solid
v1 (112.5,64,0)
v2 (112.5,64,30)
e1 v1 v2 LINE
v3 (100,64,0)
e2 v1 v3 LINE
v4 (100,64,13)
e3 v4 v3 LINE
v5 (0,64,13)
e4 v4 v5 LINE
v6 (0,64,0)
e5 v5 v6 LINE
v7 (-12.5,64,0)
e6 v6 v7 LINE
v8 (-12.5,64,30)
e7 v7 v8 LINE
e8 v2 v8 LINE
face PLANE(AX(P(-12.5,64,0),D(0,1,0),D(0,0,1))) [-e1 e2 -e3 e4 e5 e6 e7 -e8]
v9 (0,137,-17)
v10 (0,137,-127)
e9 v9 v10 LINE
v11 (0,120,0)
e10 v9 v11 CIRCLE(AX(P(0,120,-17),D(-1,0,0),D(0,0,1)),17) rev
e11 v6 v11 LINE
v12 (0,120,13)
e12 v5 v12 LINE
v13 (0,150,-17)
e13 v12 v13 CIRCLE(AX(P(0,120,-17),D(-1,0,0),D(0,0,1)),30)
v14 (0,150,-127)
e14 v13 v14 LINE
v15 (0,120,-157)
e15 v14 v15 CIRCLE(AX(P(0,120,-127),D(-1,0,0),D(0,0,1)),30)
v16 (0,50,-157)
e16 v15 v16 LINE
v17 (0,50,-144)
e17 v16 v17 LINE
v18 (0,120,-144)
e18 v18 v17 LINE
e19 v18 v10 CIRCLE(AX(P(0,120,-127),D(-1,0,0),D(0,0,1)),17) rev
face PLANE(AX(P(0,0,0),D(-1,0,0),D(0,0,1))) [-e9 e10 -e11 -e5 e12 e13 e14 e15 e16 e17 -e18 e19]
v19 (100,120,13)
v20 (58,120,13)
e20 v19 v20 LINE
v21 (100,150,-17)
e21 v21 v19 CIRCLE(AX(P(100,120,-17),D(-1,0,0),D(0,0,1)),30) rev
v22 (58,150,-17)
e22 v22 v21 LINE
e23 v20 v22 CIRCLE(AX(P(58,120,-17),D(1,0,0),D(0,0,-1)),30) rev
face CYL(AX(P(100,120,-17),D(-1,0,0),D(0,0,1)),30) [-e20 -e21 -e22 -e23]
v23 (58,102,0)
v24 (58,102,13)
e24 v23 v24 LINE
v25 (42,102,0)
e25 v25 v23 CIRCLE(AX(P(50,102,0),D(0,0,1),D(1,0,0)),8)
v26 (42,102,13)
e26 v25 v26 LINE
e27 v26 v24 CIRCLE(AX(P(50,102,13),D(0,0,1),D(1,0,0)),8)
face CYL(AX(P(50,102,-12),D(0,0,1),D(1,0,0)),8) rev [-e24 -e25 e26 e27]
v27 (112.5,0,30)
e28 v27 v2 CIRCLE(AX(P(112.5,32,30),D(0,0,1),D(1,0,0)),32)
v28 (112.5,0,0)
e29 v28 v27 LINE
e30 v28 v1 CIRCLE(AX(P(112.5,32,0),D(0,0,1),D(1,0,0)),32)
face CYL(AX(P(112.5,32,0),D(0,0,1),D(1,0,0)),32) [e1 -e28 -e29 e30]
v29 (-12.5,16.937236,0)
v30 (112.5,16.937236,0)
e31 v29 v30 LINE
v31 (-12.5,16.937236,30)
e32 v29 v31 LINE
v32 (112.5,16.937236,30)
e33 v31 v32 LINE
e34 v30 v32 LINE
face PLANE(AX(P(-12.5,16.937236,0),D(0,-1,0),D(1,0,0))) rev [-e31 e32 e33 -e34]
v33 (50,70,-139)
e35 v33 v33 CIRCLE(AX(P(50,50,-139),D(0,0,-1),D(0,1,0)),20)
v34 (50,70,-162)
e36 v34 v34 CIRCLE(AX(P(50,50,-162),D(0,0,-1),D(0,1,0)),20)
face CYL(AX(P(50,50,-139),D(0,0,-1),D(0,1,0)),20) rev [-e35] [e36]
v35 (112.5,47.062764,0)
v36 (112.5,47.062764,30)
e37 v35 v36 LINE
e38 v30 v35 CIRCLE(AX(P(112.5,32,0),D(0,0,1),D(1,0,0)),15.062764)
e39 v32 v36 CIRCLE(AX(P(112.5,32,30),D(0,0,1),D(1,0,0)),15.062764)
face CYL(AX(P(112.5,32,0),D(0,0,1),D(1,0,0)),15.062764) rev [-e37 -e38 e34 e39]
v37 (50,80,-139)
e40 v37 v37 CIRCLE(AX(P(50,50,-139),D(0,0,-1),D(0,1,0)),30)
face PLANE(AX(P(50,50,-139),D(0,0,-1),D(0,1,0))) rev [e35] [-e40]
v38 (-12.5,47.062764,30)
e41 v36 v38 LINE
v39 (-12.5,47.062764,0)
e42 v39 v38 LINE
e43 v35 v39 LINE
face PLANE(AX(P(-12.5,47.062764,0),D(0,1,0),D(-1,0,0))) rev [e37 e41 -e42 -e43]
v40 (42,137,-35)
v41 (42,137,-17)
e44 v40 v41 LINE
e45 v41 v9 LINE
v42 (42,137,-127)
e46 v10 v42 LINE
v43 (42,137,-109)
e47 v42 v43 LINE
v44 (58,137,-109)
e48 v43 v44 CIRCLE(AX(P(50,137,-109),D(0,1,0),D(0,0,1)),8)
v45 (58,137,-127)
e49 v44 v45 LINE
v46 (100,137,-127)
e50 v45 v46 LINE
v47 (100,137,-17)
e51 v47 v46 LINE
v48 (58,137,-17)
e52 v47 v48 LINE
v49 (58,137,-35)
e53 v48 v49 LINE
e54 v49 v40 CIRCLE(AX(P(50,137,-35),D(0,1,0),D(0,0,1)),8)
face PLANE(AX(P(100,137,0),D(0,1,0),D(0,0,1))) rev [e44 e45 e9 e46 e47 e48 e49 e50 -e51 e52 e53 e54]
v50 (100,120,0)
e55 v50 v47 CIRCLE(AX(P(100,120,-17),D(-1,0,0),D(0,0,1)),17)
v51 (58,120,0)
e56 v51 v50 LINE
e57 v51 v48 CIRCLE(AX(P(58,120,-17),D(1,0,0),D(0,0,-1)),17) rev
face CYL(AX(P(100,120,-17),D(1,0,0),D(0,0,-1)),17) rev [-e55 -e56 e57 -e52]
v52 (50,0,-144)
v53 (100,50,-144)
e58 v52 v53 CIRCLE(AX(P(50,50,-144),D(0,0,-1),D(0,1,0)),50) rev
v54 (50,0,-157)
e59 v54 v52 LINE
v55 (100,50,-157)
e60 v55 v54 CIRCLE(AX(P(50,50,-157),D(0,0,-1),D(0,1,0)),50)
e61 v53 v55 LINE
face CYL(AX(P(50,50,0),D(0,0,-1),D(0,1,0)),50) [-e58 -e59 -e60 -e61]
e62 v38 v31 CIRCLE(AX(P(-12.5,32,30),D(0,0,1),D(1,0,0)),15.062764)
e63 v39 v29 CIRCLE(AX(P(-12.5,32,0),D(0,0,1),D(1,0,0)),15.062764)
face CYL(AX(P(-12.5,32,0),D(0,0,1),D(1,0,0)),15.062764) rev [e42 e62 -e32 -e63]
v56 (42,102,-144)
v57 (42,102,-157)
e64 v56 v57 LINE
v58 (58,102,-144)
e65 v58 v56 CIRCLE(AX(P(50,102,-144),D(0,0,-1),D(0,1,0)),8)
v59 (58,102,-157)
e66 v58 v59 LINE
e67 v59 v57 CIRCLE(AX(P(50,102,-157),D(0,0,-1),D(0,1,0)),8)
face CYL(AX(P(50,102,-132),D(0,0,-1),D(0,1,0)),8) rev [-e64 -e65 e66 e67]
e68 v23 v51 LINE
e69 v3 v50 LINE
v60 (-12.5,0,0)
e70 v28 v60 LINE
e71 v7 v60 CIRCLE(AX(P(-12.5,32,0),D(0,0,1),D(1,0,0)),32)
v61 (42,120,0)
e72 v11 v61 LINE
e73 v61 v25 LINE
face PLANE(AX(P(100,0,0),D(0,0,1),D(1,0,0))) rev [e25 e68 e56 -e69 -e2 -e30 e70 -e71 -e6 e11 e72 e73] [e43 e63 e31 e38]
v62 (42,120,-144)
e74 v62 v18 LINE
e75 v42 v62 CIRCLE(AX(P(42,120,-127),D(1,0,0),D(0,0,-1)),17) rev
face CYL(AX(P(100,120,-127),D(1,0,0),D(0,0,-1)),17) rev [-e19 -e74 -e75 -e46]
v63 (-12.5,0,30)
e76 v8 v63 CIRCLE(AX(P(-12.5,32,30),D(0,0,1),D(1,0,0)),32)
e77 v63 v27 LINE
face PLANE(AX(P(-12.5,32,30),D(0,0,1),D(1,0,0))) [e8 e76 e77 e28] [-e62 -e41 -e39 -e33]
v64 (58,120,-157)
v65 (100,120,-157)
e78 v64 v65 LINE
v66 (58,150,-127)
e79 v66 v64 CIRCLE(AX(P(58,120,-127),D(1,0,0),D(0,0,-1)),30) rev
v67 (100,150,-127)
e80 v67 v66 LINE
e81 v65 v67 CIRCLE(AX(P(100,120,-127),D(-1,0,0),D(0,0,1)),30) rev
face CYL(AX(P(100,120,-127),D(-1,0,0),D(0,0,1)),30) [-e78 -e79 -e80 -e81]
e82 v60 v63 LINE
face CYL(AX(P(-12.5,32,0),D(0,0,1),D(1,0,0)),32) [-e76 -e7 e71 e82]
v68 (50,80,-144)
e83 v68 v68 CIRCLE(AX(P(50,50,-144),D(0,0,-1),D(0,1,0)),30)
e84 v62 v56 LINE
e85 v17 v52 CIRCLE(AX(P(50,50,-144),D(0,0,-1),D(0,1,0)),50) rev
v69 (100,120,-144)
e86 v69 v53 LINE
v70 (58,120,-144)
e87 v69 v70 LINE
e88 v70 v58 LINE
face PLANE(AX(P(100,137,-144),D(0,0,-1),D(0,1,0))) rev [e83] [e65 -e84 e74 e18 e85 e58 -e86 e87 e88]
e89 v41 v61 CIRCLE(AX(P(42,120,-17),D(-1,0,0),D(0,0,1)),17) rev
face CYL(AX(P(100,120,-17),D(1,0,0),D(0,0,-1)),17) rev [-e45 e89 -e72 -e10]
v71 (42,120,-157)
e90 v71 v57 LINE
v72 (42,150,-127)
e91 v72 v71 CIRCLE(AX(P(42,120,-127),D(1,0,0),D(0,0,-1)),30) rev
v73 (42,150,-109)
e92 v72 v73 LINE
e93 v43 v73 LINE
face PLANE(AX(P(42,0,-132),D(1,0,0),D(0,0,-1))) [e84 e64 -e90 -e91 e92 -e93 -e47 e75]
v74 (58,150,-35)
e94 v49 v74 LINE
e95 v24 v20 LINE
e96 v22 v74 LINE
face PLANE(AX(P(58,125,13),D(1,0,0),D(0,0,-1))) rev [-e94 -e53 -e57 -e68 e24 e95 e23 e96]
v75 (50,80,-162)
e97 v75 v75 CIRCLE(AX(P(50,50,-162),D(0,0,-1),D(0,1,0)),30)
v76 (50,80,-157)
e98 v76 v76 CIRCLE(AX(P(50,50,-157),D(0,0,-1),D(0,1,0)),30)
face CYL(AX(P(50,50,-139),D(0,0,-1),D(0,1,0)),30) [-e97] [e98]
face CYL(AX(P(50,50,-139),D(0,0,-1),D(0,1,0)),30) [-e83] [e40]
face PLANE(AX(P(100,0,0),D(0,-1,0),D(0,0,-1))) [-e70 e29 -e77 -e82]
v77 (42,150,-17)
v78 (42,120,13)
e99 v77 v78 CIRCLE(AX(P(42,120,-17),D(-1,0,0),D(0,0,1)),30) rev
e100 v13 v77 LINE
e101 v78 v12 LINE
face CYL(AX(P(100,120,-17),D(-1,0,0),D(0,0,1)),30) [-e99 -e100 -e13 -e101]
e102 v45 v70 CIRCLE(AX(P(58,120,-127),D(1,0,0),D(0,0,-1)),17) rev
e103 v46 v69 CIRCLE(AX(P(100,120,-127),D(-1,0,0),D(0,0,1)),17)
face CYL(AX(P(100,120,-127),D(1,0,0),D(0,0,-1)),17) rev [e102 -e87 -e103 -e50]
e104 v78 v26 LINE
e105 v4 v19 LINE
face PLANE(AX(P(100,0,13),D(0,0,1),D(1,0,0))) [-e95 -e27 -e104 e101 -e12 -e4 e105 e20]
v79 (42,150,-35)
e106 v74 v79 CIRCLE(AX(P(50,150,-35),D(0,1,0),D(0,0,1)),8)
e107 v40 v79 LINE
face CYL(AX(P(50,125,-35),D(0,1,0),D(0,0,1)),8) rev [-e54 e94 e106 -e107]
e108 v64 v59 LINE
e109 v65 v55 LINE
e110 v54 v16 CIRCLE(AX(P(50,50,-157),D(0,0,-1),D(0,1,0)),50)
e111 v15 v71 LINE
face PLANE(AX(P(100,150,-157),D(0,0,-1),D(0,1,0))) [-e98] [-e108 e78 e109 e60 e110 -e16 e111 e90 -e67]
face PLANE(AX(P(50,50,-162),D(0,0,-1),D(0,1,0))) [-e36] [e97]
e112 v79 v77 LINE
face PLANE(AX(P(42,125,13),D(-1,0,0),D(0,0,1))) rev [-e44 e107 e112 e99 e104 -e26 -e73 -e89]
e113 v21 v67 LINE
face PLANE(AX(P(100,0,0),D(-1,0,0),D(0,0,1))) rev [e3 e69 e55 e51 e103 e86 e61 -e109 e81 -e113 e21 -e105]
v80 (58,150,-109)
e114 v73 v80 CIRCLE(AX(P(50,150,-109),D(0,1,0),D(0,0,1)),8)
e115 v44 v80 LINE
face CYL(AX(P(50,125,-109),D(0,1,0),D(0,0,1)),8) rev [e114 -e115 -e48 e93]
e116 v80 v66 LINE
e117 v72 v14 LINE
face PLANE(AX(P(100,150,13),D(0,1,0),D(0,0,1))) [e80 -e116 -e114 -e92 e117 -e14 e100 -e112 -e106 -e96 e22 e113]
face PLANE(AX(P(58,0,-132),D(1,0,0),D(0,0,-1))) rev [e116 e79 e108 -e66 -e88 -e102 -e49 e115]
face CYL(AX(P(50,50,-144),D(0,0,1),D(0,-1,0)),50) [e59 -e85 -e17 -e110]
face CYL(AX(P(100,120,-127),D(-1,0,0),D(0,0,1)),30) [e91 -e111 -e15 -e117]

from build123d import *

# Parameters (mm, degrees)
BOSS_EXTRUDE1_DEPTH      = 100
FILLET1_R                = 30
FILLET2_R                = 17
BOSS_EXTRUDE2_DEPTH      = 17
BOSS_EXTRUDE2_DEPTH_BACK = 13
CUT_EXTRUDE1_START       = -17
SKETCH2_4_W              = 100
SKETCH2_4_H              = 30.125527048
CUT_EXTRUDE1_DEPTH       = 17
FILLET3_R                = 50
BOSS_EXTRUDE3_DEPTH      = 5
BOSS_EXTRUDE3_DEPTH_BACK = 18
SKETCH3_R                = 30
SKETCH3_R_2              = 20
SKETCH3_2_R              = 20
CUT_EXTRUDE2_DEPTH       = 25
CUT_EXTRUDE3_DEPTH       = 25
CUT_EXTRUDE4_DEPTH       = 25
CUT_EXTRUDE5_START       = -25
CUT_EXTRUDE5_DEPTH       = 25


with BuildPart() as part:
    # Sketch1 → Boss-Extrude1 (new body)
    with BuildSketch(Plane(origin=(0, 0, 0), x_dir=(0, 0, -1), z_dir=(1, 0, 0))):
        Polygon((0, 0), (0, 137), (144, 137), (144, 0), (157, 0), (157, 150), (-13, 150), (-13, 0), align=None)
    extrude(amount=BOSS_EXTRUDE1_DEPTH)

    # Fillet1
    fillet1_edges = [part.edges().sort_by_distance(p)[0] for p in [
        (50, 150, -157),
        (50, 150, 13),
    ]]
    fillet(fillet1_edges, radius=FILLET1_R)

    # Fillet2
    fillet2_edges = [part.edges().sort_by_distance(p)[0] for p in [
        (50, 137, 0),
        (50, 137, -144),
    ]]
    fillet(fillet2_edges, radius=FILLET2_R)

    # Sketch2 → Boss-Extrude2 (add, two sides: drawn at the far end of the back side and taken through both)
    with BuildSketch(Plane.XY.offset(13).offset(-BOSS_EXTRUDE2_DEPTH_BACK)):
        with BuildLine():
            Line((-12.5, 64), (112.5, 64))
            ThreePointArc((112.5, 64), (144.5, 32), (112.5, 0))
            Line((112.5, 0), (-12.5, 0))
            ThreePointArc((-12.5, 0), (-44.5, 32), (-12.5, 64))
        make_face()
        with BuildLine():
            Line((-12.5, 47.062763524), (112.5, 47.062763524))
            ThreePointArc((112.5, 47.062763524), (127.562763524, 32), (112.5, 16.937236476))
            Line((112.5, 16.937236476), (-12.5, 16.937236476))
            ThreePointArc((-12.5, 16.937236476), (-27.562763524, 32), (-12.5, 47.062763524))
        make_face(mode=Mode.SUBTRACT)
    extrude(amount=BOSS_EXTRUDE2_DEPTH + BOSS_EXTRUDE2_DEPTH_BACK)

    # Sketch2<4> → Cut-Extrude1 (cut)
    with BuildSketch(Plane.XY.offset(13).offset(CUT_EXTRUDE1_START)):
        with BuildLine():
            Line((0, 16.937236476), (0, 47.062763524))
            Line((0, 47.062763524), (-12.5, 47.062763524))
            ThreePointArc((-12.5, 47.062763524), (-27.562763524, 32), (-12.5, 16.937236476))
            Line((-12.5, 16.937236476), (0, 16.937236476))
        make_face()
        with Locations((50, 32)):
            Rectangle(SKETCH2_4_W, SKETCH2_4_H)
        with BuildLine():
            Line((112.5, 47.062763524), (100, 47.062763524))
            Line((100, 47.062763524), (100, 16.937236476))
            Line((100, 16.937236476), (112.5, 16.937236476))
            ThreePointArc((112.5, 16.937236476), (127.562763524, 32), (112.5, 47.062763524))
        make_face()
    extrude(amount=CUT_EXTRUDE1_DEPTH, mode=Mode.SUBTRACT)

    # Fillet3
    fillet3_edges = [part.edges().sort_by_distance(p)[0] for p in [
        (0, 0, -150.5),
        (100, 0, -150.5),
    ]]
    fillet(fillet3_edges, radius=FILLET3_R - 0.0001)  # a hair under: the kernel refuses the full size

    # Sketch3 → Boss-Extrude3 (add, two sides: drawn at the far end of the back side and taken through both)
    with BuildSketch(Plane(origin=(0, 0, -157), x_dir=(-1, 0, 0), z_dir=(0, 0, -1)).offset(-BOSS_EXTRUDE3_DEPTH_BACK)):
        with Locations(Location((-50, 50, 0), (0, 0, 90))):
            Circle(SKETCH3_R)
        with Locations(Location((-50, 50, 0), (0, 0, 90))):
            Circle(SKETCH3_R_2, mode=Mode.SUBTRACT)
    extrude(amount=BOSS_EXTRUDE3_DEPTH + BOSS_EXTRUDE3_DEPTH_BACK)

    # Sketch3<2> → Cut-Extrude2 (cut)
    with BuildSketch(Plane(origin=(0, 0, -157), x_dir=(-1, 0, 0), z_dir=(0, 0, -1))):
        with Locations(Location((-50, 50, 0), (0, 0, 90))):
            Circle(SKETCH3_2_R)
    extrude(amount=-CUT_EXTRUDE2_DEPTH, mode=Mode.SUBTRACT)

    # Sketch4 → Cut-Extrude3 (cut)
    with BuildSketch(Plane(origin=(0, 0, -157), x_dir=(-1, 0, 0), z_dir=(0, 0, -1))):
        with BuildLine():
            Line((-58, 150), (-58, 102))
            ThreePointArc((-58, 102), (-50, 94), (-42, 102))
            Line((-42, 102), (-42, 150))
            ThreePointArc((-42, 150), (-50, 158), (-58, 150))
        make_face()
    extrude(amount=-CUT_EXTRUDE3_DEPTH, mode=Mode.SUBTRACT)

    # Sketch5 → Cut-Extrude4 (cut)
    with BuildSketch(Plane(origin=(0, 150, 0), x_dir=(1, 0, 0), z_dir=(0, 1, 0))):
        with BuildLine():
            Line((58, 157), (58, 109))
            ThreePointArc((58, 109), (50, 101), (42, 109))
            Line((42, 109), (42, 157))
            ThreePointArc((42, 157), (50, 165), (58, 157))
        make_face()
        with BuildLine():
            Line((42, -13), (42, 35))
            ThreePointArc((42, 35), (50, 43), (58, 35))
            Line((58, 35), (58, -13))
            ThreePointArc((58, -13), (50, -21), (42, -13))
        make_face()
    extrude(amount=-CUT_EXTRUDE4_DEPTH, mode=Mode.SUBTRACT)

    # Sketch6 → Cut-Extrude5 (cut)
    with BuildSketch(Plane.XY.offset(13).offset(CUT_EXTRUDE5_START)):
        with BuildLine():
            Line((58, 150), (58, 102))
            ThreePointArc((58, 102), (50, 94), (42, 102))
            Line((42, 102), (42, 150))
            ThreePointArc((42, 150), (50, 158), (58, 150))
        make_face()
    extrude(amount=CUT_EXTRUDE5_DEPTH, mode=Mode.SUBTRACT)


solid = part.part
